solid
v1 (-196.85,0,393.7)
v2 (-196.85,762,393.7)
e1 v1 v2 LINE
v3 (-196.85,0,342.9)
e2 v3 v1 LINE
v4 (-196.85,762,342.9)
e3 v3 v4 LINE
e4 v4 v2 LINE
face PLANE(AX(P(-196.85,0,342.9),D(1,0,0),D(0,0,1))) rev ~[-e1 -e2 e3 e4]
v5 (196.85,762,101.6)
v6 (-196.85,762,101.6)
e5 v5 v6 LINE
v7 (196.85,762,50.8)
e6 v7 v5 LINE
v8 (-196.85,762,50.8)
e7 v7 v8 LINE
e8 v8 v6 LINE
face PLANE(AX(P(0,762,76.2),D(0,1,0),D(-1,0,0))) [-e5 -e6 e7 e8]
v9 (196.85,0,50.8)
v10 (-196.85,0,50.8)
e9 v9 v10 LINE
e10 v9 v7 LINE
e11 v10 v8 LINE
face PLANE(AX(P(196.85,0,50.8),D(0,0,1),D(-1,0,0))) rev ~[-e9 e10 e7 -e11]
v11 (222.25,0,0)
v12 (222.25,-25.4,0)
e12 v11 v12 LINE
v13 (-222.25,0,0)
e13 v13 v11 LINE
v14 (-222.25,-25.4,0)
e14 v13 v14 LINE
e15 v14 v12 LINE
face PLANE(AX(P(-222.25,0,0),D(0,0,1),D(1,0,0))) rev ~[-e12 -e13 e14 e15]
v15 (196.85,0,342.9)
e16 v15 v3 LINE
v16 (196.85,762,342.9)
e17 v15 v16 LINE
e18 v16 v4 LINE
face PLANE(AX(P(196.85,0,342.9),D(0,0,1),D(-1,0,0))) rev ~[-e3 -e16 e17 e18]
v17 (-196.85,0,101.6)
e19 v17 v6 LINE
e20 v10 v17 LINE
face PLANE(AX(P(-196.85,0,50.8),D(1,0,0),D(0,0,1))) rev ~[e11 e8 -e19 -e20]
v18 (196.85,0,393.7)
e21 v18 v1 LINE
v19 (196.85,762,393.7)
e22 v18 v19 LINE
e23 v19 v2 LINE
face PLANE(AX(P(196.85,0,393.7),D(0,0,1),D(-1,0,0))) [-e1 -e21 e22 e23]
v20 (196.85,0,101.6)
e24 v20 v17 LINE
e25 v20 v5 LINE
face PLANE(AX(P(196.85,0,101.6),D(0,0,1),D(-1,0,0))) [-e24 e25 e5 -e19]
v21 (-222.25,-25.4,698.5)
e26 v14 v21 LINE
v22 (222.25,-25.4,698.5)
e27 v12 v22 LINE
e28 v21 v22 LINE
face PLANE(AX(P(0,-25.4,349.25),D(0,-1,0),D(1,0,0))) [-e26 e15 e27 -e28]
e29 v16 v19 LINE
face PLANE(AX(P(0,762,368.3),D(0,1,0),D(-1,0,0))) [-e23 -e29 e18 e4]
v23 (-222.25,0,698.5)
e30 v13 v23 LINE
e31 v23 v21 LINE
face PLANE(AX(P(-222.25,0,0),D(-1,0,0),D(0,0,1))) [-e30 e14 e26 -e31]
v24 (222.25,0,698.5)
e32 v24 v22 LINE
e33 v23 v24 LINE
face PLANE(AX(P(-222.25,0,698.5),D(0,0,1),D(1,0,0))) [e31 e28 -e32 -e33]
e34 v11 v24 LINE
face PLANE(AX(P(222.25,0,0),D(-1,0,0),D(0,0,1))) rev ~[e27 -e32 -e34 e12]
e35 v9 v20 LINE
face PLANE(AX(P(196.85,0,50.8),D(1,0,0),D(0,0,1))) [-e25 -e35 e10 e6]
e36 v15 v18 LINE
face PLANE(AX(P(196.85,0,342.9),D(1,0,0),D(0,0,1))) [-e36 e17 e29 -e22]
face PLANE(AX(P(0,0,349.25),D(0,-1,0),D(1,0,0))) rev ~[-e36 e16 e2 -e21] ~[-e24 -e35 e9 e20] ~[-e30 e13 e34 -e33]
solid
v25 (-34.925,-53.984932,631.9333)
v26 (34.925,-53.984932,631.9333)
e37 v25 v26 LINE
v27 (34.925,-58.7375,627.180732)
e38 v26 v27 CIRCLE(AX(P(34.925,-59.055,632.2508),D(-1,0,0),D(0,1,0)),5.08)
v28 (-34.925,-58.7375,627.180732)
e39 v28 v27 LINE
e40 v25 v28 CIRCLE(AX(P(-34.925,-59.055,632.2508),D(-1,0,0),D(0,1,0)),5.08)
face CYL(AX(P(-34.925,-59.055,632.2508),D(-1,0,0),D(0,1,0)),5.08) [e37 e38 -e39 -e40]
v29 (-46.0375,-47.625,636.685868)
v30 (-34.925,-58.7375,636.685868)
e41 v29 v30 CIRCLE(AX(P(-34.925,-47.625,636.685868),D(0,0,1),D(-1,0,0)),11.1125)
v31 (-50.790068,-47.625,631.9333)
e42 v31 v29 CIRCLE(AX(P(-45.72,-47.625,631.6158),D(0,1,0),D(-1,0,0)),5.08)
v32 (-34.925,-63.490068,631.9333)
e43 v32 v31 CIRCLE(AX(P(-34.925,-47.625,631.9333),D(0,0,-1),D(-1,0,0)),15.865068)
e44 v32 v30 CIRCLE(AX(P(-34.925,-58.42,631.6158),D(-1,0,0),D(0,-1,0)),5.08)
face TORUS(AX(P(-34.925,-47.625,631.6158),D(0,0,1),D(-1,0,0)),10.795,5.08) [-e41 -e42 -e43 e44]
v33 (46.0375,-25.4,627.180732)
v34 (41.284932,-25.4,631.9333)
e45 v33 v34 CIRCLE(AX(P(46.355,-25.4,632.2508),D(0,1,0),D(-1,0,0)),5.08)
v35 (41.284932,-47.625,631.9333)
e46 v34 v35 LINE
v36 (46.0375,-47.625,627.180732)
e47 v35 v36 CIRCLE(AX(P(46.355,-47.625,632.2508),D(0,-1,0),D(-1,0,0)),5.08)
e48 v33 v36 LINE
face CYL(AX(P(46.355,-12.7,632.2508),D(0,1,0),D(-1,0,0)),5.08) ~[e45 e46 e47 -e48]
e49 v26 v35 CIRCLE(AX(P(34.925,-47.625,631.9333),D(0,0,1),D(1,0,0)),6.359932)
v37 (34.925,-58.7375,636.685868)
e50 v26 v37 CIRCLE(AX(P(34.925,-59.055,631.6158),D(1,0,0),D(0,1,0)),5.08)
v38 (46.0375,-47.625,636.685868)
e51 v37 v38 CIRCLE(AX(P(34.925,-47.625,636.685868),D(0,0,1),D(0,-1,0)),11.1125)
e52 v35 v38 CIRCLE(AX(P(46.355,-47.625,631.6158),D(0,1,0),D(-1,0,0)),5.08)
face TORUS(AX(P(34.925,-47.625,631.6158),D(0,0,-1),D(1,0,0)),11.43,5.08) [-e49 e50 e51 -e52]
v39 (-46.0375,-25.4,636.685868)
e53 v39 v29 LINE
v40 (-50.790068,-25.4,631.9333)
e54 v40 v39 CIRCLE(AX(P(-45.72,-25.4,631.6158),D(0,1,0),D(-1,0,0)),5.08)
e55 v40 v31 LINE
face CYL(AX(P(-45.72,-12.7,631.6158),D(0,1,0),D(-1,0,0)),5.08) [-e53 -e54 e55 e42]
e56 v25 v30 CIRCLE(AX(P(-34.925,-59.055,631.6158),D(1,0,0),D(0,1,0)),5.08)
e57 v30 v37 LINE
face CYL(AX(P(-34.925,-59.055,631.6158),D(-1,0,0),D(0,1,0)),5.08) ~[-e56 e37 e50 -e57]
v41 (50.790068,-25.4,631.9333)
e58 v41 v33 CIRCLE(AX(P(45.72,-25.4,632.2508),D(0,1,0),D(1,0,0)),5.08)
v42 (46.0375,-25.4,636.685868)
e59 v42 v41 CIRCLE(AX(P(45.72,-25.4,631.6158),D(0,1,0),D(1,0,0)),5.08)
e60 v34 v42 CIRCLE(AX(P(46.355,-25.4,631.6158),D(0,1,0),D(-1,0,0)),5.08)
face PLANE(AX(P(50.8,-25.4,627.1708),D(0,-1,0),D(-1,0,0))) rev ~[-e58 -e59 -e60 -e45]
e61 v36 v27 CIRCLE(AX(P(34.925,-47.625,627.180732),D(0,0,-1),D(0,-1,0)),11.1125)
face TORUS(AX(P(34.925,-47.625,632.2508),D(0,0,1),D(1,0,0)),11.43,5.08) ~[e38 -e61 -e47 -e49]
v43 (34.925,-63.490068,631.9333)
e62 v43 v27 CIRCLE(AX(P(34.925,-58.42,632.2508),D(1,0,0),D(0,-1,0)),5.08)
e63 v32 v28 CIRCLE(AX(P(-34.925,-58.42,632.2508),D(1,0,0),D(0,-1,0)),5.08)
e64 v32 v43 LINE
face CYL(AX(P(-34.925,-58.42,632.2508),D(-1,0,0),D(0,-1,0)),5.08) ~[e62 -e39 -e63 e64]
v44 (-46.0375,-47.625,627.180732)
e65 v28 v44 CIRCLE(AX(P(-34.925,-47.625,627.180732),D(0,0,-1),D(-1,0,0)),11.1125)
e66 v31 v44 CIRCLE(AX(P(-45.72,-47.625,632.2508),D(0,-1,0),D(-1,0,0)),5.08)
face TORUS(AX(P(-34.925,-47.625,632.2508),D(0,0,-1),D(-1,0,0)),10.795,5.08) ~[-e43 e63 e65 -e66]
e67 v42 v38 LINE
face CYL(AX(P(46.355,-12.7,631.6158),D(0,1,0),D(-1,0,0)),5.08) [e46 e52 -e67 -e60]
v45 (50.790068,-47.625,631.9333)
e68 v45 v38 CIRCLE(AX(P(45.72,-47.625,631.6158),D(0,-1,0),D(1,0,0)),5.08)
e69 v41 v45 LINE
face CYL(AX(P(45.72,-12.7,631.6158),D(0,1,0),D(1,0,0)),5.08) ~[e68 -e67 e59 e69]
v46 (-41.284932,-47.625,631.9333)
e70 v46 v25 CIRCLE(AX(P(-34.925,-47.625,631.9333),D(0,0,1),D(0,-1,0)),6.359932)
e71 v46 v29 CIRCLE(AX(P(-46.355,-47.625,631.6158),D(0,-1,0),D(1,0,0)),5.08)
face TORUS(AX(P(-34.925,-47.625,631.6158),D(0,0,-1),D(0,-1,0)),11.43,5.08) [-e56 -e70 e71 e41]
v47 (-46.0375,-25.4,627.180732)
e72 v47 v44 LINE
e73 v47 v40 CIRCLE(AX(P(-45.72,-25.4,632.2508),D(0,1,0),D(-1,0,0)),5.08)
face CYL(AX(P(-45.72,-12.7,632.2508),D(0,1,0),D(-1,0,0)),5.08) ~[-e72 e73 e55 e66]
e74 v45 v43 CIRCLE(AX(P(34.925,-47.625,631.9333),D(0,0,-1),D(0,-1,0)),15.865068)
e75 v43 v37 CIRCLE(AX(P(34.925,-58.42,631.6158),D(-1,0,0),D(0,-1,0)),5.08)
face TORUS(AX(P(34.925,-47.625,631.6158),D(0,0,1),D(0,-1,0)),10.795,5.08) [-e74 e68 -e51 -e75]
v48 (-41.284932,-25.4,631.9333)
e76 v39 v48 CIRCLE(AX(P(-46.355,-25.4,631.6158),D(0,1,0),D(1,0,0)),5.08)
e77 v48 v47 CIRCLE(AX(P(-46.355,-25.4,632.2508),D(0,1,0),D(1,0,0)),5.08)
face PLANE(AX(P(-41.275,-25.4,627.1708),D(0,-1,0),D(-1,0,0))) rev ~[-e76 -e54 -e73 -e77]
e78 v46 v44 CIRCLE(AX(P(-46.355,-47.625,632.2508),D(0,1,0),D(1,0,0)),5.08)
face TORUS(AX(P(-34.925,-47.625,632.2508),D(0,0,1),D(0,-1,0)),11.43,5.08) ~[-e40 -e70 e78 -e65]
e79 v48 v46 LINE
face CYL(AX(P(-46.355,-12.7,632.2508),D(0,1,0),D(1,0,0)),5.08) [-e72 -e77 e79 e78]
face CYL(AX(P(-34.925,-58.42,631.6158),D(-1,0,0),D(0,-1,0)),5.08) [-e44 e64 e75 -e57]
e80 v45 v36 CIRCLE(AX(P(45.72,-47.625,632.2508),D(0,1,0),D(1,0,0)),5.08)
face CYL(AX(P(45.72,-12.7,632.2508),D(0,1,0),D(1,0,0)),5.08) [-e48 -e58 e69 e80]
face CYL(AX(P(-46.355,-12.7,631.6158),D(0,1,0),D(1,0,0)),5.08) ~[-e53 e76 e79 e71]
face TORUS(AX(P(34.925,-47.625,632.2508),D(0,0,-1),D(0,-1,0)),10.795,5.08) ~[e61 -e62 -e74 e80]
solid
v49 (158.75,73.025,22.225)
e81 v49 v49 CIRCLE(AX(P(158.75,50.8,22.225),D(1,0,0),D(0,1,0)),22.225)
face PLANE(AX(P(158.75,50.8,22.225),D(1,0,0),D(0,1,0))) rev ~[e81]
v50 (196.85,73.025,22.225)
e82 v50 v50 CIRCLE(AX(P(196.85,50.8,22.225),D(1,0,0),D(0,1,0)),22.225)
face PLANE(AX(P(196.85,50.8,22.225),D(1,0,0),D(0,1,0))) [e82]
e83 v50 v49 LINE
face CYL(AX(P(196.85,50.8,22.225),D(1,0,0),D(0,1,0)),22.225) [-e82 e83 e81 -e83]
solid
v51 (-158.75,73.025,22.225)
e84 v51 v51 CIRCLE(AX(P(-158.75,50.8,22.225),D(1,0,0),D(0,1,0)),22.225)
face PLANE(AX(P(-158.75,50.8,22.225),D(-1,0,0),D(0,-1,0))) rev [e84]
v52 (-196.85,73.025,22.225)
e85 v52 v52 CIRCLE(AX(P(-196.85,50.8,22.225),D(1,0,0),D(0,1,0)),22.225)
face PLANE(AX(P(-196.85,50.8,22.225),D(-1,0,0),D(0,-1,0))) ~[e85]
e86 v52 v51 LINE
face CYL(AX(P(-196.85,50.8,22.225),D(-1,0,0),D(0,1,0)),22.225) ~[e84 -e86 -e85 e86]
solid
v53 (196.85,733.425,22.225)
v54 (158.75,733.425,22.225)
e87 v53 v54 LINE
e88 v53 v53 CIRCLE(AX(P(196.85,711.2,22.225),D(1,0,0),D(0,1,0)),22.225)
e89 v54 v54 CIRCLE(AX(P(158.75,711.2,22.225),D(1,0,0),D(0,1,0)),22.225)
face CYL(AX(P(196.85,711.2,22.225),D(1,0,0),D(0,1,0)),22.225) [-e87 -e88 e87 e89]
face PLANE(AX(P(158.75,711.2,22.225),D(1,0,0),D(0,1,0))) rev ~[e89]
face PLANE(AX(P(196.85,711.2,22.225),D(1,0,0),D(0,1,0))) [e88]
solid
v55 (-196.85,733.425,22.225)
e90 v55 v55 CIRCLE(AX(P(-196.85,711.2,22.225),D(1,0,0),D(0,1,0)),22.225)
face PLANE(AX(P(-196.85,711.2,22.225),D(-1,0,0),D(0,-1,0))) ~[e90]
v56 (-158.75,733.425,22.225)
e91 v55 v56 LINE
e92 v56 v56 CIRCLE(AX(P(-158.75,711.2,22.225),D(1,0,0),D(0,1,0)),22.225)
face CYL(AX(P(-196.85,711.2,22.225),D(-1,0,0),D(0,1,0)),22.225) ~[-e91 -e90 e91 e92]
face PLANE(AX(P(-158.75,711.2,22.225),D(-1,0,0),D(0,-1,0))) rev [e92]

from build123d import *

# Parameters (mm, degrees)
F0_W          = 444.5
F0_H          = 698.5
F1_DEPTH      = 25.4
F2_W          = 393.7
F2_H          = 50.8
F3_DEPTH      = 762
F4_R          = 22.225
F5_DEPTH      = 38.1
F8_DEPTH      = 9.525
F10_T1_DEPTH  = 34.925
F10_T3_DEPTH  = 69.85
F10_T6_ANGLE  = 90
F10_T8_ANGLE  = 90
F10_T10_ANGLE = 90
F10_T12_ANGLE = 90
F10_T14_ANGLE = 90
F10_T16_ANGLE = 90
F10_T18_ANGLE = 90
F10_T20_ANGLE = 90


# Not quite as in the source:
# - a fillet or chamfer that OpenCascade refuses, or shapes differently, is made with other operations: its cross-section is extruded or revolved along the edge and cut away or added


with BuildPart() as f1:
    # F0 (on Front) → F1 (new body)
    with BuildSketch(Plane.XZ):
        with Locations((0, 349.25)):
            Rectangle(F0_W, F0_H)
    extrude(amount=F1_DEPTH)

    # F2 (on face) → F3 (join)
    with BuildSketch(Plane(origin=(0, 0, 0), x_dir=(-1, 0, 0), z_dir=(0, 1, 0))):
        with Locations((0, 368.3)):
            Rectangle(F2_W, F2_H)
        with Locations((0, 76.2)):
            Rectangle(F2_W, F2_H)
    extrude(amount=F3_DEPTH)


with BuildPart() as f5:
    # F4 (on face) → F5 (new body)
    with BuildSketch(Plane.YZ.offset(196.85)):
        with Locations((50.8, 22.225)):
            Circle(F4_R)
    extrude(amount=-F5_DEPTH)


with BuildPart() as f5b:
    # F4 (on face) → F5, piece 2 (new body)
    with BuildSketch(Plane.YZ.offset(196.85)):
        with Locations((711.2, 22.225)):
            Circle(F4_R)
    extrude(amount=-F5_DEPTH)


with BuildPart() as f6_1:
    # F6: instance of F5
    add(f5.part.mirror(Plane.YZ))


with BuildPart() as f6_2:
    # F6: instance of F5b
    add(f5b.part.mirror(Plane.YZ))


with BuildPart() as f8:
    # F7 (on Top) → F8 (new body)
    with BuildSketch(Plane.XY):
        with BuildLine():
            Line((-41.275, -25.4), (-50.8, -25.4))
            Line((-50.8, -25.4), (-50.8, -47.625))
            ThreePointArc((-50.8, -47.625), (-46.1503201513, -58.8503201513), (-34.925, -63.5))
            Line((-34.925, -63.5), (34.925, -63.5))
            ThreePointArc((34.925, -63.5), (46.1503201513, -58.8503201513), (50.8, -47.625))
            Line((50.8, -47.625), (50.8, -25.4))
            Line((50.8, -25.4), (41.275, -25.4))
            Line((41.275, -25.4), (41.275, -47.625))
            ThreePointArc((41.275, -47.625), (39.4151280605, -52.1151280605), (34.925, -53.975))
            Line((34.925, -53.975), (-34.925, -53.975))
            ThreePointArc((-34.925, -53.975), (-39.4151280605, -52.1151280605), (-41.275, -47.625))
            Line((-41.275, -47.625), (-41.275, -25.4))
        make_face()
    extrude(amount=F8_DEPTH)


with BuildPart() as f8_1:
    # F9: moved
    add(f8.part.moved(Location((0, 0, 627.1708))))

    # F10: fillet of radius 5.08 on 4 edges, made by hand

    # F10_s2 → F10_t1 (cut)
    with BuildSketch(Plane.XZ.offset(12.7)):
        with BuildLine():
            ThreePointArc((-41.275, 631.6158), (-42.7628975516, 635.2079024484), (-46.355, 636.6958))
            Line((-46.355, 636.6958), (-41.275, 636.6958))
            Line((-41.275, 636.6958), (-41.275, 631.6158))
        make_face()
        with BuildLine():
            ThreePointArc((-50.8, 631.6158), (-49.3121024484, 635.2079024484), (-45.72, 636.6958))
            Line((-45.72, 636.6958), (-50.8, 636.6958))
            Line((-50.8, 636.6958), (-50.8, 631.6158))
        make_face()
        with BuildLine():
            ThreePointArc((-41.275, 632.2508), (-42.7628975516, 628.6586975516), (-46.355, 627.1708))
            Line((-46.355, 627.1708), (-41.275, 627.1708))
            Line((-41.275, 627.1708), (-41.275, 632.2508))
        make_face()
        with BuildLine():
            ThreePointArc((50.8, 632.2508), (49.3121024484, 628.6586975516), (45.72, 627.1708))
            Line((45.72, 627.1708), (50.8, 627.1708))
            Line((50.8, 627.1708), (50.8, 632.2508))
        make_face()
        with BuildLine():
            ThreePointArc((-50.8, 632.2508), (-49.3121024484, 628.6586975516), (-45.72, 627.1708))
            Line((-45.72, 627.1708), (-50.8, 627.1708))
            Line((-50.8, 627.1708), (-50.8, 632.2508))
        make_face()
        with BuildLine():
            ThreePointArc((41.275, 632.2508), (42.7628975516, 628.6586975516), (46.355, 627.1708))
            Line((46.355, 627.1708), (41.275, 627.1708))
            Line((41.275, 627.1708), (41.275, 632.2508))
        make_face()
        with BuildLine():
            ThreePointArc((50.8, 631.6158), (49.3121024484, 635.2079024484), (45.72, 636.6958))
            Line((45.72, 636.6958), (50.8, 636.6958))
            Line((50.8, 636.6958), (50.8, 631.6158))
        make_face()
        with BuildLine():
            ThreePointArc((41.275, 631.6158), (42.7628975516, 635.2079024484), (46.355, 636.6958))
            Line((46.355, 636.6958), (41.275, 636.6958))
            Line((41.275, 636.6958), (41.275, 631.6158))
        make_face()
    extrude(amount=F10_T1_DEPTH, mode=Mode.SUBTRACT)

    # F10_s4 → F10_t3 (cut)
    with BuildSketch(Plane.YZ.offset(-34.925)):
        with BuildLine():
            ThreePointArc((-63.5, 632.2508), (-62.0121024484, 628.6586975516), (-58.42, 627.1708))
            Line((-58.42, 627.1708), (-63.5, 627.1708))
            Line((-63.5, 627.1708), (-63.5, 632.2508))
        make_face()
        with BuildLine():
            ThreePointArc((-53.975, 632.2508), (-55.4628975516, 628.6586975516), (-59.055, 627.1708))
            Line((-59.055, 627.1708), (-53.975, 627.1708))
            Line((-53.975, 627.1708), (-53.975, 632.2508))
        make_face()
        with BuildLine():
            ThreePointArc((-63.5, 631.6158), (-62.0121024484, 635.2079024484), (-58.42, 636.6958))
            Line((-58.42, 636.6958), (-63.5, 636.6958))
            Line((-63.5, 636.6958), (-63.5, 631.6158))
        make_face()
        with BuildLine():
            ThreePointArc((-53.975, 631.6158), (-55.4628975516, 635.2079024484), (-59.055, 636.6958))
            Line((-59.055, 636.6958), (-53.975, 636.6958))
            Line((-53.975, 636.6958), (-53.975, 631.6158))
        make_face()
    extrude(amount=F10_T3_DEPTH, mode=Mode.SUBTRACT)

    # F10_s5 → F10_t6 (revolve, cut)
    with BuildSketch(Plane.XZ.offset(47.625)):
        with BuildLine():
            ThreePointArc((-50.8, 632.2508), (-49.3121024484, 628.6586975516), (-45.72, 627.1708))
            Line((-45.72, 627.1708), (-50.8, 627.1708))
            Line((-50.8, 627.1708), (-50.8, 632.2508))
        make_face()
    revolve(axis=Axis((-34.925, -47.625, 627.1708), (0, 0, 1)), revolution_arc=F10_T6_ANGLE, mode=Mode.SUBTRACT)

    # F10_s7 → F10_t8 (revolve, cut)
    with BuildSketch(Plane.YZ.offset(34.925)):
        with BuildLine():
            ThreePointArc((-63.5, 632.2508), (-62.0121024484, 628.6586975516), (-58.42, 627.1708))
            Line((-58.42, 627.1708), (-63.5, 627.1708))
            Line((-63.5, 627.1708), (-63.5, 632.2508))
        make_face()
    revolve(axis=Axis((34.925, -47.625, 627.1708), (0, 0, 1)), revolution_arc=F10_T8_ANGLE, mode=Mode.SUBTRACT)

    # F10_s9 → F10_t10 (revolve, cut)
    with BuildSketch(Plane.YZ.offset(-34.925)):
        with BuildLine():
            ThreePointArc((-53.975, 632.2508), (-55.4628975516, 628.6586975516), (-59.055, 627.1708))
            Line((-59.055, 627.1708), (-53.975, 627.1708))
            Line((-53.975, 627.1708), (-53.975, 632.2508))
        make_face()
    revolve(axis=Axis((-34.925, -47.625, 627.1708), (0, 0, -1)), revolution_arc=F10_T10_ANGLE, mode=Mode.SUBTRACT)

    # F10_s11 → F10_t12 (revolve, cut)
    with BuildSketch(Plane.XZ.offset(47.625)):
        with BuildLine():
            ThreePointArc((41.275, 632.2508), (42.7628975516, 628.6586975516), (46.355, 627.1708))
            Line((46.355, 627.1708), (41.275, 627.1708))
            Line((41.275, 627.1708), (41.275, 632.2508))
        make_face()
    revolve(axis=Axis((34.925, -47.625, 627.1708), (0, 0, -1)), revolution_arc=F10_T12_ANGLE, mode=Mode.SUBTRACT)

    # F10_s13 → F10_t14 (revolve, cut)
    with BuildSketch(Plane.XZ.offset(47.625)):
        with BuildLine():
            ThreePointArc((-50.8, 631.6158), (-49.3121024484, 635.2079024484), (-45.72, 636.6958))
            Line((-45.72, 636.6958), (-50.8, 636.6958))
            Line((-50.8, 636.6958), (-50.8, 631.6158))
        make_face()
    revolve(axis=Axis((-34.925, -47.625, 636.6958), (0, 0, 1)), revolution_arc=F10_T14_ANGLE, mode=Mode.SUBTRACT)

    # F10_s15 → F10_t16 (revolve, cut)
    with BuildSketch(Plane.YZ.offset(34.925)):
        with BuildLine():
            ThreePointArc((-63.5, 631.6158), (-62.0121024484, 635.2079024484), (-58.42, 636.6958))
            Line((-58.42, 636.6958), (-63.5, 636.6958))
            Line((-63.5, 636.6958), (-63.5, 631.6158))
        make_face()
    revolve(axis=Axis((34.925, -47.625, 636.6958), (0, 0, 1)), revolution_arc=F10_T16_ANGLE, mode=Mode.SUBTRACT)

    # F10_s17 → F10_t18 (revolve, cut)
    with BuildSketch(Plane.YZ.offset(-34.925)):
        with BuildLine():
            ThreePointArc((-53.975, 631.6158), (-55.4628975516, 635.2079024484), (-59.055, 636.6958))
            Line((-59.055, 636.6958), (-53.975, 636.6958))
            Line((-53.975, 636.6958), (-53.975, 631.6158))
        make_face()
    revolve(axis=Axis((-34.925, -47.625, 636.6958), (0, 0, -1)), revolution_arc=F10_T18_ANGLE, mode=Mode.SUBTRACT)

    # F10_s19 → F10_t20 (revolve, cut)
    with BuildSketch(Plane.XZ.offset(47.625)):
        with BuildLine():
            ThreePointArc((41.275, 631.6158), (42.7628975516, 635.2079024484), (46.355, 636.6958))
            Line((46.355, 636.6958), (41.275, 636.6958))
            Line((41.275, 636.6958), (41.275, 631.6158))
        make_face()
    revolve(axis=Axis((34.925, -47.625, 636.6958), (0, 0, -1)), revolution_arc=F10_T20_ANGLE, mode=Mode.SUBTRACT)


solid = Compound([f1.part, f5.part, f5b.part, f6_1.part, f6_2.part, f8_1.part])
